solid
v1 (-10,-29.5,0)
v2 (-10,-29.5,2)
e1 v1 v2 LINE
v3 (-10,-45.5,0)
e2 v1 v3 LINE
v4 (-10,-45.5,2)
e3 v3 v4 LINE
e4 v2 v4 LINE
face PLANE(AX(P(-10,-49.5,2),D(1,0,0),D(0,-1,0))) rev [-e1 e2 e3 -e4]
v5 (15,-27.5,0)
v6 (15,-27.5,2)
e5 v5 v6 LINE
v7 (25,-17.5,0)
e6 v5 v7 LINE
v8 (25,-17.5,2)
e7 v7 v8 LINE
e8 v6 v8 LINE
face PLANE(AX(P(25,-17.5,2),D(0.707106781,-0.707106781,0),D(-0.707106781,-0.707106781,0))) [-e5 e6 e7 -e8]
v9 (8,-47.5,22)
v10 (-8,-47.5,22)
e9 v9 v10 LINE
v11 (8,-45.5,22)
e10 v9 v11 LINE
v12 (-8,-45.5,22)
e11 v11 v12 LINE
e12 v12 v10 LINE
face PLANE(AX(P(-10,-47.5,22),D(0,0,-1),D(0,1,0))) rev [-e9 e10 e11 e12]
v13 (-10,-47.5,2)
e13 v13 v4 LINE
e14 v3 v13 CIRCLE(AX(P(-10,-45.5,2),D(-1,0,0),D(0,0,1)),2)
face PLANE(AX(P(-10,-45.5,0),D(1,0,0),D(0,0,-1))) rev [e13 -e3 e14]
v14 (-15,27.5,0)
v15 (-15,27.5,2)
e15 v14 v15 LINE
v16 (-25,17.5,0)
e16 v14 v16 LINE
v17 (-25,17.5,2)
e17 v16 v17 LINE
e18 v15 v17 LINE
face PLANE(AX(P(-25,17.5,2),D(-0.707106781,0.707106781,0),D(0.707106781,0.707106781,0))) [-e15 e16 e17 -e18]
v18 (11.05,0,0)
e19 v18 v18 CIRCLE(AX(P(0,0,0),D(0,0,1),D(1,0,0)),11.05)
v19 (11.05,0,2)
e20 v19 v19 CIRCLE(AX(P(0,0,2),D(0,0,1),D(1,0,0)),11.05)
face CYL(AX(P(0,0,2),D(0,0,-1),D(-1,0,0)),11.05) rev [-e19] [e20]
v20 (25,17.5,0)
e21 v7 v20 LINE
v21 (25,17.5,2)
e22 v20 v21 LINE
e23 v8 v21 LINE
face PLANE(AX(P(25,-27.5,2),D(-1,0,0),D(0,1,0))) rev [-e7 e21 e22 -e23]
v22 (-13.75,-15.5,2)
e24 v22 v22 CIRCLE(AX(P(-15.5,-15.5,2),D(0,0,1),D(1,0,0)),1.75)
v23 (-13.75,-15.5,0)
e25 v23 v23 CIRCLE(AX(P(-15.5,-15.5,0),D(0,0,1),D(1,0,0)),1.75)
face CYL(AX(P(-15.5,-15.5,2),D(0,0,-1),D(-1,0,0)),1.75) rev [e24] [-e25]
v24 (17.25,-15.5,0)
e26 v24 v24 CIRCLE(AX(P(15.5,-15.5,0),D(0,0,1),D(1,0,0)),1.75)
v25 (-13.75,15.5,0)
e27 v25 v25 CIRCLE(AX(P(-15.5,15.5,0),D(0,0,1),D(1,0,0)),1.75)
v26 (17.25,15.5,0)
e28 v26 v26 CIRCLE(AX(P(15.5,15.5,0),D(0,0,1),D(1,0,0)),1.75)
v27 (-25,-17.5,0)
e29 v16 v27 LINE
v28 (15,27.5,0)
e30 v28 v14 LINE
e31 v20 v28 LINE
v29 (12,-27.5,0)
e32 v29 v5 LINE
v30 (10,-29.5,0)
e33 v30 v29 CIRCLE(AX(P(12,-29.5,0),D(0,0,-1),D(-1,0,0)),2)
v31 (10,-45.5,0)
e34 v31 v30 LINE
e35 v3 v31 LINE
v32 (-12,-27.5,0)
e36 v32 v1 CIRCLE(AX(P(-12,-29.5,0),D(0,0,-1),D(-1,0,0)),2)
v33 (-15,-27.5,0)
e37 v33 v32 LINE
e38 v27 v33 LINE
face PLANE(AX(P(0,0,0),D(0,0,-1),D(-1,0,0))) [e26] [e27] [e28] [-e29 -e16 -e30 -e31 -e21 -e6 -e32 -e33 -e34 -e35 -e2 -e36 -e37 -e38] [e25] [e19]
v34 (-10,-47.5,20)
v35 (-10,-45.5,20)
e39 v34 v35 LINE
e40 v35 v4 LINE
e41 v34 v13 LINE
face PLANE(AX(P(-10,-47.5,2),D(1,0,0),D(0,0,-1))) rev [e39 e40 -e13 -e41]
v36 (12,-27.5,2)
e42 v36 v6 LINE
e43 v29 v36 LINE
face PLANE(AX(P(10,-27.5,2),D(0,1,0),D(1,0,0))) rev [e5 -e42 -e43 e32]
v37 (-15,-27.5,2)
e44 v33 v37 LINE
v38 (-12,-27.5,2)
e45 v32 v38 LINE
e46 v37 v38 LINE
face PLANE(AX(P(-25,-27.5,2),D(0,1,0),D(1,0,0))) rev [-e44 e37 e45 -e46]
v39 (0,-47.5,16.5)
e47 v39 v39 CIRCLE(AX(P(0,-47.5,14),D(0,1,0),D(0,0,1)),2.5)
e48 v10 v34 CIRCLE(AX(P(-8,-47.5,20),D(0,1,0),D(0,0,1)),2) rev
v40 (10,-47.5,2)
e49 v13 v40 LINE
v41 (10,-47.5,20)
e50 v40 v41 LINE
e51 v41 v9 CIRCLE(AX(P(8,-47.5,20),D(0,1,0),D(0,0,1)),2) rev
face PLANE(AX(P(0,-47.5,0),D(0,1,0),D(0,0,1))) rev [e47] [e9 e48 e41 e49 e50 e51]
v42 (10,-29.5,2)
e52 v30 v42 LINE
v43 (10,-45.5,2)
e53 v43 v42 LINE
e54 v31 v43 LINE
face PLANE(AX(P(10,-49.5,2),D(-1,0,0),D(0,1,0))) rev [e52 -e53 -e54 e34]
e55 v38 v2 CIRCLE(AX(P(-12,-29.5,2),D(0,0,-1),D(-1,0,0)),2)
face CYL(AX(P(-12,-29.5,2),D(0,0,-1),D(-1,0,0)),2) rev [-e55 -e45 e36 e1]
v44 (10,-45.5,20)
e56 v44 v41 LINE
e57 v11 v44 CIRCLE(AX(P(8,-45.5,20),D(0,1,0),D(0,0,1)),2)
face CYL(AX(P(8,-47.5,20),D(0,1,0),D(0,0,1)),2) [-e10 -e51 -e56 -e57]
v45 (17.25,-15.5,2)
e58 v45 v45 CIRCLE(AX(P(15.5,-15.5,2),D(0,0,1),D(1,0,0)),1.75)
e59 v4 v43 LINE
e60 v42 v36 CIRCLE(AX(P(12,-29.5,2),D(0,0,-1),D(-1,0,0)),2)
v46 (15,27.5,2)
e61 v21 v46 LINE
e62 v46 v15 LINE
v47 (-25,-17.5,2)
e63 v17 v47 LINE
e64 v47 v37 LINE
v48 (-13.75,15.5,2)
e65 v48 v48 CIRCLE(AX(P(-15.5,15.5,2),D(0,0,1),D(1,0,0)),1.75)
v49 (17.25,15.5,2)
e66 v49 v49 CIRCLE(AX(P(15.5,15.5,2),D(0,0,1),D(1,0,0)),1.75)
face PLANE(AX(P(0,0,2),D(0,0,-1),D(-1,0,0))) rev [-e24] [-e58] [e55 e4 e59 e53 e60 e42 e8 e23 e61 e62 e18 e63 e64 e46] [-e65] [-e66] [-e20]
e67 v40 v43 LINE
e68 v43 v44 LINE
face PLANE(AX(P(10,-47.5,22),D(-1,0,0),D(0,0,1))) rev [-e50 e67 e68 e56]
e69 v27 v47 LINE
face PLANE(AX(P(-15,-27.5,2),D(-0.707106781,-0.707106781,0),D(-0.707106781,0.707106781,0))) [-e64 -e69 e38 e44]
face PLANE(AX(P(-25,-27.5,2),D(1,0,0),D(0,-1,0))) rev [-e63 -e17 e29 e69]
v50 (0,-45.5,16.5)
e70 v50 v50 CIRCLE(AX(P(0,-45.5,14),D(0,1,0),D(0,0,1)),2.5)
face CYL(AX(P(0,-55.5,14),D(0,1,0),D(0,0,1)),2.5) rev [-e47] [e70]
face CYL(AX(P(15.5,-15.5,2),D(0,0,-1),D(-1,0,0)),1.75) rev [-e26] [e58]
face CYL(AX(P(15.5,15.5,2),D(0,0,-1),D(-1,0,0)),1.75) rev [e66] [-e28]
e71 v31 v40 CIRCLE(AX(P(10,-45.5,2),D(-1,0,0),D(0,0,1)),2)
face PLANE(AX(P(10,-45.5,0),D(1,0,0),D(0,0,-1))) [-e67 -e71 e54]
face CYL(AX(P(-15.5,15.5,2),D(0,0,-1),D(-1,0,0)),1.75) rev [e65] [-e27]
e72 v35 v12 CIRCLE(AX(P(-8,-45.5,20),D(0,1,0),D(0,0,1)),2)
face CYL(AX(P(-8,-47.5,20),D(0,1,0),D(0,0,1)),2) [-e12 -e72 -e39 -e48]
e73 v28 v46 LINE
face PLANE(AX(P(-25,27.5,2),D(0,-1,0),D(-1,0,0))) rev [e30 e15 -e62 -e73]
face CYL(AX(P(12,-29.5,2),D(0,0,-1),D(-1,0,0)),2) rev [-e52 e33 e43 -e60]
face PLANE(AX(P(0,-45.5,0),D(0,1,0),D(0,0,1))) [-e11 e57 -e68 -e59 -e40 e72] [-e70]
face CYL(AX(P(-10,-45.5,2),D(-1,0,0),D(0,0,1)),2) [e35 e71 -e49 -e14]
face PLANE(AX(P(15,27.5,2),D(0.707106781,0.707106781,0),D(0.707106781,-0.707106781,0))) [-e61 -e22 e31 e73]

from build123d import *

# Parameters (mm, degrees)
SCHIZZO1_R                   = 1.75
SCHIZZO1_R_2                 = 11.05
ESTRUSIONE_ESTRUSIONE1_DEPTH = 2
SCHIZZO14_W                  = 20
SCHIZZO14_H                  = 2
ESTRUSIONE_ESTRUSIONE2_DEPTH = 22
SCHIZZO15_R                  = 2.5
TAGLIO_ESTRUSIONE1_DEPTH     = 10
SMUSSO1_SIZE                 = 10
RACCORDO1_R                  = 2
CONVERTI_SOLIDO2_START       = -49.5
CONVERTI_SOLIDO2_OUTLINE_R   = 2.5
CONVERTI_SOLIDO2_DEPTH       = 4
BORDO_FLANGIA1_START         = -10
BORDO_FLANGIA1_DEPTH         = 20
SCHIZZO27_R                  = 2.5
TAGLIO_ESTRUSIONE2_DEPTH     = 10
RACCORDO3_R                  = 2


# Read off the part's stored shape, not the designer's step: Converti-Solido2, Bordo-Flangia1
with BuildPart() as part:
    # Schizzo1 → Estrusione-Estrusione1 (new body)
    with BuildSketch(Plane.XY):
        Polygon((-25, -27.5), (-10, -27.5), (-10, -49.5), (10, -49.5), (10, -27.5), (25, -27.5), (25, 27.5), (-25, 27.5), align=None)
        with Locations((-15.5, 15.5)):
            Circle(SCHIZZO1_R, mode=Mode.SUBTRACT)
        with Locations((15.5, 15.5)):
            Circle(SCHIZZO1_R, mode=Mode.SUBTRACT)
        with Locations((15.5, -15.5)):
            Circle(SCHIZZO1_R, mode=Mode.SUBTRACT)
        with Locations((-15.5, -15.5)):
            Circle(SCHIZZO1_R, mode=Mode.SUBTRACT)
        Circle(SCHIZZO1_R_2, mode=Mode.SUBTRACT)
    extrude(amount=ESTRUSIONE_ESTRUSIONE1_DEPTH)

    # Schizzo14 → Estrusione-Estrusione2 (add)
    with BuildSketch(Plane.XY.offset(2)):
        with Locations((0, -48.5)):
            Rectangle(SCHIZZO14_W, SCHIZZO14_H)
    extrude(amount=ESTRUSIONE_ESTRUSIONE2_DEPTH)

    # Schizzo15 → Taglio-Estrusione1 (cut)
    with BuildSketch(Plane(origin=(0, -47.5, 0), x_dir=(1, 0, 0), z_dir=(0, 1, 0))):
        with Locations(Location((0, -14, 0), (0, 0, 270))):
            Circle(SCHIZZO15_R)
    extrude(amount=-TAGLIO_ESTRUSIONE1_DEPTH, mode=Mode.SUBTRACT)

    # Smusso1
    smusso1_edges = [part.edges().sort_by_distance(p)[0] for p in [
        (25, -27.5, 1),
        (-25, -27.5, 1),
        (-25, 27.5, 1),
        (25, 27.5, 1),
    ]]
    chamfer(smusso1_edges, length=SMUSSO1_SIZE)

    # Raccordo1
    raccordo1_edges = [part.edges().sort_by_distance(p)[0] for p in [
        (10, -27.5, 1),
        (-10, -27.5, 1),
        (0, -47.5, 2),
        (-10, -48.5, 24),
        (10, -48.5, 24),
        (0, -49.5, 0),
    ]]
    fillet(raccordo1_edges, radius=RACCORDO1_R)

    # Converti-Solido2 outline → Converti-Solido2 (cut)
    with BuildSketch(Plane(origin=(0, 0, 0), x_dir=(1, 0, 0), z_dir=(0, 1, 0)).offset(CONVERTI_SOLIDO2_START)):
        with BuildLine():
            Line((-10, 0), (-10, -22))
            ThreePointArc((-10, -22), (-9.414213562, -23.414213562), (-8, -24))
            Line((-8, -24), (8, -24))
            ThreePointArc((8, -24), (9.414213562, -23.414213562), (10, -22))
            Line((10, -22), (10, 0))
            Line((10, 0), (-10, 0))
        make_face()
        with Locations((0, -14)):
            Circle(CONVERTI_SOLIDO2_OUTLINE_R, mode=Mode.SUBTRACT)
    extrude(amount=CONVERTI_SOLIDO2_DEPTH, mode=Mode.SUBTRACT)

    # Bordo-Flangia1 outline → Bordo-Flangia1 (add)
    with BuildSketch(Plane.YZ.offset(BORDO_FLANGIA1_START)):
        with BuildLine():
            ThreePointArc((-47.5, 2), (-46.914213562, 0.585786438), (-45.5, 0))
            Line((-45.5, 0), (-45.5, 22))
            Line((-45.5, 22), (-47.5, 22))
            Line((-47.5, 22), (-47.5, 2))
        make_face()
    extrude(amount=BORDO_FLANGIA1_DEPTH)

    # Schizzo27 → Taglio-Estrusione2 (cut)
    with BuildSketch(Plane(origin=(0, -45.5, 0), x_dir=(1, 0, 0), z_dir=(0, 1, 0))):
        with Locations(Location((0, -14, 0), (0, 0, 270))):
            Circle(SCHIZZO27_R)
    extrude(amount=-TAGLIO_ESTRUSIONE2_DEPTH, mode=Mode.SUBTRACT)

    # Raccordo3
    raccordo3_edges = [part.edges().sort_by_distance(p)[0] for p in [
        (10, -46.5, 22),
        (-10, -46.5, 22),
    ]]
    fillet(raccordo3_edges, radius=RACCORDO3_R)


solid = part.part
